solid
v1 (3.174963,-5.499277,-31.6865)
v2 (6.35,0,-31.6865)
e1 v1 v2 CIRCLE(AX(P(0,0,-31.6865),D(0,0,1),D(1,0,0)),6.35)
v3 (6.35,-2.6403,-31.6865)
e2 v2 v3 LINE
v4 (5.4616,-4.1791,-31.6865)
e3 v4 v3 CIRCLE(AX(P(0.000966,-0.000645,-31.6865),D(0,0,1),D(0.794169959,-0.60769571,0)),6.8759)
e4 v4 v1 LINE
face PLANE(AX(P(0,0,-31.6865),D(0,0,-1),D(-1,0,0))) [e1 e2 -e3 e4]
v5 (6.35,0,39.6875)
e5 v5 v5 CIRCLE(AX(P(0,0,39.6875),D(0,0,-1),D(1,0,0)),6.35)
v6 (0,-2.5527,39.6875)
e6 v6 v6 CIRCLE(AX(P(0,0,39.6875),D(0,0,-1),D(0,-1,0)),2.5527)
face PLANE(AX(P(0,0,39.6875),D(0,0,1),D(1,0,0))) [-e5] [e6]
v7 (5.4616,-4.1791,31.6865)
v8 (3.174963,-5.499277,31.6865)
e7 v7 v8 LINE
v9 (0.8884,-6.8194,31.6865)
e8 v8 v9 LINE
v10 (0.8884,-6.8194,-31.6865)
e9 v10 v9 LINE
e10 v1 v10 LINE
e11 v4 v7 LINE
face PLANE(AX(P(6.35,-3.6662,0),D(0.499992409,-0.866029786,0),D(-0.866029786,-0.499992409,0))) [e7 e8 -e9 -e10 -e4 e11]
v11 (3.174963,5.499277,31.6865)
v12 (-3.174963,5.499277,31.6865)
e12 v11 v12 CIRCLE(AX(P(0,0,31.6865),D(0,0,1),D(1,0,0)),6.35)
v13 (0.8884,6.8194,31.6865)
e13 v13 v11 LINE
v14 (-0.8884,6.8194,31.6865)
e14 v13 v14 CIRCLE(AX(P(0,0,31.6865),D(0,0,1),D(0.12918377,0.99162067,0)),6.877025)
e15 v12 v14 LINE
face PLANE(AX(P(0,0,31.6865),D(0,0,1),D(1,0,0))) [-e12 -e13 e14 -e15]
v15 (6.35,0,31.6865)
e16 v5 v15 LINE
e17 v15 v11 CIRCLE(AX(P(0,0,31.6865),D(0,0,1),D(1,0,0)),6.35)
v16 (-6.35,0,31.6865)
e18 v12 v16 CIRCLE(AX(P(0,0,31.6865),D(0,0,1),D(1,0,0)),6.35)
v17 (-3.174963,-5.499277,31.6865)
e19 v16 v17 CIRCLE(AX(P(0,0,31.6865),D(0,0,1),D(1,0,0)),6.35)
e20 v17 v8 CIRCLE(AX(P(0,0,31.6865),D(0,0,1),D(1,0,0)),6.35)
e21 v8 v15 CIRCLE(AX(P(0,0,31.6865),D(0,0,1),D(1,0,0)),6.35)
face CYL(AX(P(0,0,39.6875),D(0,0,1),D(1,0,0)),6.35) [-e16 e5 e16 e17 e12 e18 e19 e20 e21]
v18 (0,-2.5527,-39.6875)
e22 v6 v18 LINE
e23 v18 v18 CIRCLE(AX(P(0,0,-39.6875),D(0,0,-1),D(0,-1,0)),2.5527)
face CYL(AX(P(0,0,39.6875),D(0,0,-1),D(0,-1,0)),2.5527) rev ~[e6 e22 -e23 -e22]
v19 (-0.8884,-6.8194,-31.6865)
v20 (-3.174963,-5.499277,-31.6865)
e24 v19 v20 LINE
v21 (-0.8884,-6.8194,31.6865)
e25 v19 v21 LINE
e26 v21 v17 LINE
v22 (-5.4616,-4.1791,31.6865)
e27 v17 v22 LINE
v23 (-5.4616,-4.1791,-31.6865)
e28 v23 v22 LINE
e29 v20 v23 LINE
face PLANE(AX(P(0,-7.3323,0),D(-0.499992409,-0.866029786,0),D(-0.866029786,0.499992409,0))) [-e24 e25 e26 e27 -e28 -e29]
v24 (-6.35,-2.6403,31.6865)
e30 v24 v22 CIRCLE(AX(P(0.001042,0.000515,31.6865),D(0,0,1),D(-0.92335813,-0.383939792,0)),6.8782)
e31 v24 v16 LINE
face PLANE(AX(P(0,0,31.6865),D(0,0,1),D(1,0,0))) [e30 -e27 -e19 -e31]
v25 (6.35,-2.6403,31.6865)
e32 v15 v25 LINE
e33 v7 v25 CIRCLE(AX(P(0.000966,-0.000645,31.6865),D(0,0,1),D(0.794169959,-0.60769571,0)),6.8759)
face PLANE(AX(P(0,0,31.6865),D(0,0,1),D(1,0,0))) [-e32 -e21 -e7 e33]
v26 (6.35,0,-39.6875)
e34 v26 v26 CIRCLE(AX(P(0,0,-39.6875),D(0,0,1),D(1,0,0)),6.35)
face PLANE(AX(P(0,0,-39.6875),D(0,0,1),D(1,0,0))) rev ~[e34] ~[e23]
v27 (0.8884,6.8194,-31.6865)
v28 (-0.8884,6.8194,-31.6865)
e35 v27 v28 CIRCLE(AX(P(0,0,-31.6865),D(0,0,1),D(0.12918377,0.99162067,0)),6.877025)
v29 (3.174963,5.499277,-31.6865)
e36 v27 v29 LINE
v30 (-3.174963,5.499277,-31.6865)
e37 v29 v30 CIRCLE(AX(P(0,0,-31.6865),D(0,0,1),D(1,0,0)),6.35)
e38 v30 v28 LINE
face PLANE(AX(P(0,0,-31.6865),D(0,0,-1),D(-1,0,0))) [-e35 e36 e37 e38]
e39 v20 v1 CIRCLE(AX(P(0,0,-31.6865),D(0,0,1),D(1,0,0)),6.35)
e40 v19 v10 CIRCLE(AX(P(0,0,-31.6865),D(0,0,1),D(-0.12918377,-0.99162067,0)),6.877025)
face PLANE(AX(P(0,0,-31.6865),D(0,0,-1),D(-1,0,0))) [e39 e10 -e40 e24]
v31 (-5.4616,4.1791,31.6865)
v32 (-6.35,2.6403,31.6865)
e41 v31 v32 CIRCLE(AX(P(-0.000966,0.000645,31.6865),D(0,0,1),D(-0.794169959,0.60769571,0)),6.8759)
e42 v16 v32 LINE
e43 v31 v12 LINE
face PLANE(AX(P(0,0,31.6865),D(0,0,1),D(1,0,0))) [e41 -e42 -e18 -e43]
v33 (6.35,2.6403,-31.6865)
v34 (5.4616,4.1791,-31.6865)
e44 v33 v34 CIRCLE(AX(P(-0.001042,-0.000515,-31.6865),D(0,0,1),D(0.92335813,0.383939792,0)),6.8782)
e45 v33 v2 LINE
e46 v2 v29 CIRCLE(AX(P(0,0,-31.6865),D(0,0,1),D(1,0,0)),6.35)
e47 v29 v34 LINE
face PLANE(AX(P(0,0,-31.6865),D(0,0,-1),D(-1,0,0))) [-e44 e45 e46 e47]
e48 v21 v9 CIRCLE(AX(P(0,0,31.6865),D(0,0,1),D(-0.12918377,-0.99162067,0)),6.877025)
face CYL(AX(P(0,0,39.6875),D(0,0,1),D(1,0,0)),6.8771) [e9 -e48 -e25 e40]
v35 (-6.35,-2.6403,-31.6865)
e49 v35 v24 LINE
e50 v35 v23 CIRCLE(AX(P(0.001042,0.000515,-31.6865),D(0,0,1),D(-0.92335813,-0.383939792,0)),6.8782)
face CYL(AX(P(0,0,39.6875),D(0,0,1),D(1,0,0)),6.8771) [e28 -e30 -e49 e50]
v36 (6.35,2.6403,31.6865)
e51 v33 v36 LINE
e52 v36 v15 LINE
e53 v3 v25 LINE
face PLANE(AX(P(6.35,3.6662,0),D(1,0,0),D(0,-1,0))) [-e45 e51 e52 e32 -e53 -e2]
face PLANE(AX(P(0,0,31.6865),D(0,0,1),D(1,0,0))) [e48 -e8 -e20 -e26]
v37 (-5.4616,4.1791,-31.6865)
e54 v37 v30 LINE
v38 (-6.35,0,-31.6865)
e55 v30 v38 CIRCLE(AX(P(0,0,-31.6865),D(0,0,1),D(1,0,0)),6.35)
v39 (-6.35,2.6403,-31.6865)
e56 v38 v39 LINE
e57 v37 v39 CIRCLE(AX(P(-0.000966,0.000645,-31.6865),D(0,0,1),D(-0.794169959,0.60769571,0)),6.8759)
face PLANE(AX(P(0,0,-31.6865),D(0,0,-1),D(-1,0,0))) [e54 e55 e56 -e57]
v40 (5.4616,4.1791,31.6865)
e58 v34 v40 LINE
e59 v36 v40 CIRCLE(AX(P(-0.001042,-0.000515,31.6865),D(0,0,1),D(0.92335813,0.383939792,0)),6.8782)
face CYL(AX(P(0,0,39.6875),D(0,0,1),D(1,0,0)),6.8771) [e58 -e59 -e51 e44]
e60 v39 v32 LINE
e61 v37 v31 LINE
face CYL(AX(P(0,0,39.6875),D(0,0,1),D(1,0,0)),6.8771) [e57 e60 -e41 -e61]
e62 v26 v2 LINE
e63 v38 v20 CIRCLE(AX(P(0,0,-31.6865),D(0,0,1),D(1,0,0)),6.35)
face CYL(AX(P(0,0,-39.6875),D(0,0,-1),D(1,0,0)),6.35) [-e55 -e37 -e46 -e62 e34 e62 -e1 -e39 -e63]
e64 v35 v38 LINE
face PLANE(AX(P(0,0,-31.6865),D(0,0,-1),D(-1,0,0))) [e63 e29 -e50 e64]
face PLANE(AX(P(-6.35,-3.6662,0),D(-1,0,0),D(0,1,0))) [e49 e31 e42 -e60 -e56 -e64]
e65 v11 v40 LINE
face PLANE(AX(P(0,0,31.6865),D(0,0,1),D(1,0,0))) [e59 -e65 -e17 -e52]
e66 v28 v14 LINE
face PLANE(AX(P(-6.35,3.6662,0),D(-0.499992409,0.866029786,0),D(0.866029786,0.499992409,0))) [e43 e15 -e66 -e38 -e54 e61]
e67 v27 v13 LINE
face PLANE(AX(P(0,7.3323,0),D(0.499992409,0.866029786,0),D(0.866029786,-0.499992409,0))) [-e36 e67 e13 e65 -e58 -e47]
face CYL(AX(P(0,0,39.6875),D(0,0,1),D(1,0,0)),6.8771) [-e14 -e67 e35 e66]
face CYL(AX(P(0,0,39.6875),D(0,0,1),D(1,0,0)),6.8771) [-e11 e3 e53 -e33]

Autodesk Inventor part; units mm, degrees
ref_plane "YZ Plane" through (0, 0, 0) normal (1, 0, 0) x (0, 1, 0)
ref_plane "XZ Plane" through (0, 0, 0) normal (0, 1, 0) x (-1, 0, 0)
ref_plane "XY Plane" through (0, 0, 0) normal (0, 0, 1) x (1, 0, 0)
sketch "Sketch1" plane through (0, 0, 0) normal (0, 0, 1) x (1, 0, 0)
  line L0 (-6.35, -3.6662) -> (-6.35, 3.6662)
  line L1 (-6.35, 3.6662) -> (0, 7.3323)
  line L2 (0, 7.3323) -> (6.35, 3.6662)
  line L3 (6.35, 3.6662) -> (6.35, -3.6662)
  line L4 (6.35, -3.6662) -> (0, -7.3323)
  line L5 (0, -7.3323) -> (-6.35, -3.6662)
  point P0 (0, 0)
  point P1 (0, 0)
  dimension "Size" = 12.7
extrude "Extrusion1" add sketch "Sketch1" along normal mid plane 79.375
sketch "Sketch3" plane through (0, 0, 39.6875) normal (0, 0, 1) x (1, 0, 0)
  line L0 (-6.35, 3.6662) -> (0, 7.3323) construction
  line L1 (0, 7.3323) -> (6.35, 3.6662) construction
  line L2 (6.35, 3.6662) -> (6.35, -3.6662) construction
  line L3 (6.35, -3.6662) -> (0, -7.3323) construction
  line L4 (0, -7.3323) -> (-6.35, -3.6662) construction
  line L5 (-6.35, -3.6662) -> (-6.35, 3.6662) construction
  point P0 (0, 0)
hole "Hole1" at (0, 0, 39.6875) direction (0, 0, -1) diameter 5.1054 end through all
sketch "Sketch4" plane through (0, 0, 39.6875) normal (0, 0, 1) x (1, 0, 0)
  circle A0 centre (0, 0) radius 2.5527 construction
  line L0 (-6.35, 3.6662) -> (0, 7.3323) construction
  line L1 (0, 7.3323) -> (6.35, 3.6662) construction
  line L2 (6.35, 3.6662) -> (6.35, -3.6662) construction
  line L3 (6.35, -3.6662) -> (0, -7.3323) construction
  line L4 (0, -7.3323) -> (-6.35, -3.6662) construction
  line L5 (-6.35, -3.6662) -> (-6.35, 3.6662) construction
  circle A1 centre (0, 0) radius 6.8771
  circle A2 centre (0, 0) radius 8.89
  dimension "thunder" = 13.7541
  dimension "d16" = 17.78
extrude "Extrusion3" cut sketch "Sketch4" against normal through all
sketch "Sketch5" plane through (0, 0, 39.6875) normal (0, 0, 1) x (1, 0, 0)
  arc A0 (5.4616, -4.1791) -> (6.35, -2.6403) centre (0, 0) ccw projected
  line L0 (5.4616, -4.1791) -> (0.8884, -6.8194) projected
  arc A1 (-0.8884, -6.8194) -> (0.8884, -6.8194) centre (0, 0) ccw projected
  line L1 (-0.8884, -6.8194) -> (-5.4616, -4.1791) projected
  arc A2 (-6.35, -2.6403) -> (-5.4616, -4.1791) centre (0, 0) ccw projected
  line L2 (-6.35, -2.6403) -> (-6.35, 2.6403) projected
  arc A3 (-5.4616, 4.1791) -> (-6.35, 2.6403) centre (0, 0) ccw projected
  line L3 (-5.4616, 4.1791) -> (-0.8884, 6.8194) projected
  arc A4 (0.8884, 6.8194) -> (-0.8884, 6.8194) centre (0, 0) ccw projected
  line L4 (0.8884, 6.8194) -> (5.4616, 4.1791) projected
  arc A5 (6.35, 2.6403) -> (5.4616, 4.1791) centre (0, 0) ccw projected
  line L5 (6.35, 2.6403) -> (6.35, -2.6403) projected
  circle A6 centre (0, 0) radius 2.5527 projected
  circle A7 centre (0, 0) radius 6.35
  point P0 (-3.175, 5.4993)
  point P1 (3.175, 5.4993)
  point P2 (6.35, 0)
  point P3 (-6.35, 0)
  point P4 (-3.175, -5.4993)
  point P5 (3.175, -5.4993)
  dimension "d19" = 12.7
extrude "Extrusion4" cut sketch "Sketch5" against normal blind 8.001 contours L0 A7 L5 A0 | L0 A1 L1 A7 | A7 L4 A5 L5 | L1 A2 L2 A7 | A7 L3 A4 L4 | L2 A3 L3 A7
mirror "Mirror2" about plane through (0, 0, 0) normal (0, 0, 1) of "Extrusion4"
equation "\"bearing\" = 25.4"
properties part number "CL4-011" material "Aluminum 6061"
